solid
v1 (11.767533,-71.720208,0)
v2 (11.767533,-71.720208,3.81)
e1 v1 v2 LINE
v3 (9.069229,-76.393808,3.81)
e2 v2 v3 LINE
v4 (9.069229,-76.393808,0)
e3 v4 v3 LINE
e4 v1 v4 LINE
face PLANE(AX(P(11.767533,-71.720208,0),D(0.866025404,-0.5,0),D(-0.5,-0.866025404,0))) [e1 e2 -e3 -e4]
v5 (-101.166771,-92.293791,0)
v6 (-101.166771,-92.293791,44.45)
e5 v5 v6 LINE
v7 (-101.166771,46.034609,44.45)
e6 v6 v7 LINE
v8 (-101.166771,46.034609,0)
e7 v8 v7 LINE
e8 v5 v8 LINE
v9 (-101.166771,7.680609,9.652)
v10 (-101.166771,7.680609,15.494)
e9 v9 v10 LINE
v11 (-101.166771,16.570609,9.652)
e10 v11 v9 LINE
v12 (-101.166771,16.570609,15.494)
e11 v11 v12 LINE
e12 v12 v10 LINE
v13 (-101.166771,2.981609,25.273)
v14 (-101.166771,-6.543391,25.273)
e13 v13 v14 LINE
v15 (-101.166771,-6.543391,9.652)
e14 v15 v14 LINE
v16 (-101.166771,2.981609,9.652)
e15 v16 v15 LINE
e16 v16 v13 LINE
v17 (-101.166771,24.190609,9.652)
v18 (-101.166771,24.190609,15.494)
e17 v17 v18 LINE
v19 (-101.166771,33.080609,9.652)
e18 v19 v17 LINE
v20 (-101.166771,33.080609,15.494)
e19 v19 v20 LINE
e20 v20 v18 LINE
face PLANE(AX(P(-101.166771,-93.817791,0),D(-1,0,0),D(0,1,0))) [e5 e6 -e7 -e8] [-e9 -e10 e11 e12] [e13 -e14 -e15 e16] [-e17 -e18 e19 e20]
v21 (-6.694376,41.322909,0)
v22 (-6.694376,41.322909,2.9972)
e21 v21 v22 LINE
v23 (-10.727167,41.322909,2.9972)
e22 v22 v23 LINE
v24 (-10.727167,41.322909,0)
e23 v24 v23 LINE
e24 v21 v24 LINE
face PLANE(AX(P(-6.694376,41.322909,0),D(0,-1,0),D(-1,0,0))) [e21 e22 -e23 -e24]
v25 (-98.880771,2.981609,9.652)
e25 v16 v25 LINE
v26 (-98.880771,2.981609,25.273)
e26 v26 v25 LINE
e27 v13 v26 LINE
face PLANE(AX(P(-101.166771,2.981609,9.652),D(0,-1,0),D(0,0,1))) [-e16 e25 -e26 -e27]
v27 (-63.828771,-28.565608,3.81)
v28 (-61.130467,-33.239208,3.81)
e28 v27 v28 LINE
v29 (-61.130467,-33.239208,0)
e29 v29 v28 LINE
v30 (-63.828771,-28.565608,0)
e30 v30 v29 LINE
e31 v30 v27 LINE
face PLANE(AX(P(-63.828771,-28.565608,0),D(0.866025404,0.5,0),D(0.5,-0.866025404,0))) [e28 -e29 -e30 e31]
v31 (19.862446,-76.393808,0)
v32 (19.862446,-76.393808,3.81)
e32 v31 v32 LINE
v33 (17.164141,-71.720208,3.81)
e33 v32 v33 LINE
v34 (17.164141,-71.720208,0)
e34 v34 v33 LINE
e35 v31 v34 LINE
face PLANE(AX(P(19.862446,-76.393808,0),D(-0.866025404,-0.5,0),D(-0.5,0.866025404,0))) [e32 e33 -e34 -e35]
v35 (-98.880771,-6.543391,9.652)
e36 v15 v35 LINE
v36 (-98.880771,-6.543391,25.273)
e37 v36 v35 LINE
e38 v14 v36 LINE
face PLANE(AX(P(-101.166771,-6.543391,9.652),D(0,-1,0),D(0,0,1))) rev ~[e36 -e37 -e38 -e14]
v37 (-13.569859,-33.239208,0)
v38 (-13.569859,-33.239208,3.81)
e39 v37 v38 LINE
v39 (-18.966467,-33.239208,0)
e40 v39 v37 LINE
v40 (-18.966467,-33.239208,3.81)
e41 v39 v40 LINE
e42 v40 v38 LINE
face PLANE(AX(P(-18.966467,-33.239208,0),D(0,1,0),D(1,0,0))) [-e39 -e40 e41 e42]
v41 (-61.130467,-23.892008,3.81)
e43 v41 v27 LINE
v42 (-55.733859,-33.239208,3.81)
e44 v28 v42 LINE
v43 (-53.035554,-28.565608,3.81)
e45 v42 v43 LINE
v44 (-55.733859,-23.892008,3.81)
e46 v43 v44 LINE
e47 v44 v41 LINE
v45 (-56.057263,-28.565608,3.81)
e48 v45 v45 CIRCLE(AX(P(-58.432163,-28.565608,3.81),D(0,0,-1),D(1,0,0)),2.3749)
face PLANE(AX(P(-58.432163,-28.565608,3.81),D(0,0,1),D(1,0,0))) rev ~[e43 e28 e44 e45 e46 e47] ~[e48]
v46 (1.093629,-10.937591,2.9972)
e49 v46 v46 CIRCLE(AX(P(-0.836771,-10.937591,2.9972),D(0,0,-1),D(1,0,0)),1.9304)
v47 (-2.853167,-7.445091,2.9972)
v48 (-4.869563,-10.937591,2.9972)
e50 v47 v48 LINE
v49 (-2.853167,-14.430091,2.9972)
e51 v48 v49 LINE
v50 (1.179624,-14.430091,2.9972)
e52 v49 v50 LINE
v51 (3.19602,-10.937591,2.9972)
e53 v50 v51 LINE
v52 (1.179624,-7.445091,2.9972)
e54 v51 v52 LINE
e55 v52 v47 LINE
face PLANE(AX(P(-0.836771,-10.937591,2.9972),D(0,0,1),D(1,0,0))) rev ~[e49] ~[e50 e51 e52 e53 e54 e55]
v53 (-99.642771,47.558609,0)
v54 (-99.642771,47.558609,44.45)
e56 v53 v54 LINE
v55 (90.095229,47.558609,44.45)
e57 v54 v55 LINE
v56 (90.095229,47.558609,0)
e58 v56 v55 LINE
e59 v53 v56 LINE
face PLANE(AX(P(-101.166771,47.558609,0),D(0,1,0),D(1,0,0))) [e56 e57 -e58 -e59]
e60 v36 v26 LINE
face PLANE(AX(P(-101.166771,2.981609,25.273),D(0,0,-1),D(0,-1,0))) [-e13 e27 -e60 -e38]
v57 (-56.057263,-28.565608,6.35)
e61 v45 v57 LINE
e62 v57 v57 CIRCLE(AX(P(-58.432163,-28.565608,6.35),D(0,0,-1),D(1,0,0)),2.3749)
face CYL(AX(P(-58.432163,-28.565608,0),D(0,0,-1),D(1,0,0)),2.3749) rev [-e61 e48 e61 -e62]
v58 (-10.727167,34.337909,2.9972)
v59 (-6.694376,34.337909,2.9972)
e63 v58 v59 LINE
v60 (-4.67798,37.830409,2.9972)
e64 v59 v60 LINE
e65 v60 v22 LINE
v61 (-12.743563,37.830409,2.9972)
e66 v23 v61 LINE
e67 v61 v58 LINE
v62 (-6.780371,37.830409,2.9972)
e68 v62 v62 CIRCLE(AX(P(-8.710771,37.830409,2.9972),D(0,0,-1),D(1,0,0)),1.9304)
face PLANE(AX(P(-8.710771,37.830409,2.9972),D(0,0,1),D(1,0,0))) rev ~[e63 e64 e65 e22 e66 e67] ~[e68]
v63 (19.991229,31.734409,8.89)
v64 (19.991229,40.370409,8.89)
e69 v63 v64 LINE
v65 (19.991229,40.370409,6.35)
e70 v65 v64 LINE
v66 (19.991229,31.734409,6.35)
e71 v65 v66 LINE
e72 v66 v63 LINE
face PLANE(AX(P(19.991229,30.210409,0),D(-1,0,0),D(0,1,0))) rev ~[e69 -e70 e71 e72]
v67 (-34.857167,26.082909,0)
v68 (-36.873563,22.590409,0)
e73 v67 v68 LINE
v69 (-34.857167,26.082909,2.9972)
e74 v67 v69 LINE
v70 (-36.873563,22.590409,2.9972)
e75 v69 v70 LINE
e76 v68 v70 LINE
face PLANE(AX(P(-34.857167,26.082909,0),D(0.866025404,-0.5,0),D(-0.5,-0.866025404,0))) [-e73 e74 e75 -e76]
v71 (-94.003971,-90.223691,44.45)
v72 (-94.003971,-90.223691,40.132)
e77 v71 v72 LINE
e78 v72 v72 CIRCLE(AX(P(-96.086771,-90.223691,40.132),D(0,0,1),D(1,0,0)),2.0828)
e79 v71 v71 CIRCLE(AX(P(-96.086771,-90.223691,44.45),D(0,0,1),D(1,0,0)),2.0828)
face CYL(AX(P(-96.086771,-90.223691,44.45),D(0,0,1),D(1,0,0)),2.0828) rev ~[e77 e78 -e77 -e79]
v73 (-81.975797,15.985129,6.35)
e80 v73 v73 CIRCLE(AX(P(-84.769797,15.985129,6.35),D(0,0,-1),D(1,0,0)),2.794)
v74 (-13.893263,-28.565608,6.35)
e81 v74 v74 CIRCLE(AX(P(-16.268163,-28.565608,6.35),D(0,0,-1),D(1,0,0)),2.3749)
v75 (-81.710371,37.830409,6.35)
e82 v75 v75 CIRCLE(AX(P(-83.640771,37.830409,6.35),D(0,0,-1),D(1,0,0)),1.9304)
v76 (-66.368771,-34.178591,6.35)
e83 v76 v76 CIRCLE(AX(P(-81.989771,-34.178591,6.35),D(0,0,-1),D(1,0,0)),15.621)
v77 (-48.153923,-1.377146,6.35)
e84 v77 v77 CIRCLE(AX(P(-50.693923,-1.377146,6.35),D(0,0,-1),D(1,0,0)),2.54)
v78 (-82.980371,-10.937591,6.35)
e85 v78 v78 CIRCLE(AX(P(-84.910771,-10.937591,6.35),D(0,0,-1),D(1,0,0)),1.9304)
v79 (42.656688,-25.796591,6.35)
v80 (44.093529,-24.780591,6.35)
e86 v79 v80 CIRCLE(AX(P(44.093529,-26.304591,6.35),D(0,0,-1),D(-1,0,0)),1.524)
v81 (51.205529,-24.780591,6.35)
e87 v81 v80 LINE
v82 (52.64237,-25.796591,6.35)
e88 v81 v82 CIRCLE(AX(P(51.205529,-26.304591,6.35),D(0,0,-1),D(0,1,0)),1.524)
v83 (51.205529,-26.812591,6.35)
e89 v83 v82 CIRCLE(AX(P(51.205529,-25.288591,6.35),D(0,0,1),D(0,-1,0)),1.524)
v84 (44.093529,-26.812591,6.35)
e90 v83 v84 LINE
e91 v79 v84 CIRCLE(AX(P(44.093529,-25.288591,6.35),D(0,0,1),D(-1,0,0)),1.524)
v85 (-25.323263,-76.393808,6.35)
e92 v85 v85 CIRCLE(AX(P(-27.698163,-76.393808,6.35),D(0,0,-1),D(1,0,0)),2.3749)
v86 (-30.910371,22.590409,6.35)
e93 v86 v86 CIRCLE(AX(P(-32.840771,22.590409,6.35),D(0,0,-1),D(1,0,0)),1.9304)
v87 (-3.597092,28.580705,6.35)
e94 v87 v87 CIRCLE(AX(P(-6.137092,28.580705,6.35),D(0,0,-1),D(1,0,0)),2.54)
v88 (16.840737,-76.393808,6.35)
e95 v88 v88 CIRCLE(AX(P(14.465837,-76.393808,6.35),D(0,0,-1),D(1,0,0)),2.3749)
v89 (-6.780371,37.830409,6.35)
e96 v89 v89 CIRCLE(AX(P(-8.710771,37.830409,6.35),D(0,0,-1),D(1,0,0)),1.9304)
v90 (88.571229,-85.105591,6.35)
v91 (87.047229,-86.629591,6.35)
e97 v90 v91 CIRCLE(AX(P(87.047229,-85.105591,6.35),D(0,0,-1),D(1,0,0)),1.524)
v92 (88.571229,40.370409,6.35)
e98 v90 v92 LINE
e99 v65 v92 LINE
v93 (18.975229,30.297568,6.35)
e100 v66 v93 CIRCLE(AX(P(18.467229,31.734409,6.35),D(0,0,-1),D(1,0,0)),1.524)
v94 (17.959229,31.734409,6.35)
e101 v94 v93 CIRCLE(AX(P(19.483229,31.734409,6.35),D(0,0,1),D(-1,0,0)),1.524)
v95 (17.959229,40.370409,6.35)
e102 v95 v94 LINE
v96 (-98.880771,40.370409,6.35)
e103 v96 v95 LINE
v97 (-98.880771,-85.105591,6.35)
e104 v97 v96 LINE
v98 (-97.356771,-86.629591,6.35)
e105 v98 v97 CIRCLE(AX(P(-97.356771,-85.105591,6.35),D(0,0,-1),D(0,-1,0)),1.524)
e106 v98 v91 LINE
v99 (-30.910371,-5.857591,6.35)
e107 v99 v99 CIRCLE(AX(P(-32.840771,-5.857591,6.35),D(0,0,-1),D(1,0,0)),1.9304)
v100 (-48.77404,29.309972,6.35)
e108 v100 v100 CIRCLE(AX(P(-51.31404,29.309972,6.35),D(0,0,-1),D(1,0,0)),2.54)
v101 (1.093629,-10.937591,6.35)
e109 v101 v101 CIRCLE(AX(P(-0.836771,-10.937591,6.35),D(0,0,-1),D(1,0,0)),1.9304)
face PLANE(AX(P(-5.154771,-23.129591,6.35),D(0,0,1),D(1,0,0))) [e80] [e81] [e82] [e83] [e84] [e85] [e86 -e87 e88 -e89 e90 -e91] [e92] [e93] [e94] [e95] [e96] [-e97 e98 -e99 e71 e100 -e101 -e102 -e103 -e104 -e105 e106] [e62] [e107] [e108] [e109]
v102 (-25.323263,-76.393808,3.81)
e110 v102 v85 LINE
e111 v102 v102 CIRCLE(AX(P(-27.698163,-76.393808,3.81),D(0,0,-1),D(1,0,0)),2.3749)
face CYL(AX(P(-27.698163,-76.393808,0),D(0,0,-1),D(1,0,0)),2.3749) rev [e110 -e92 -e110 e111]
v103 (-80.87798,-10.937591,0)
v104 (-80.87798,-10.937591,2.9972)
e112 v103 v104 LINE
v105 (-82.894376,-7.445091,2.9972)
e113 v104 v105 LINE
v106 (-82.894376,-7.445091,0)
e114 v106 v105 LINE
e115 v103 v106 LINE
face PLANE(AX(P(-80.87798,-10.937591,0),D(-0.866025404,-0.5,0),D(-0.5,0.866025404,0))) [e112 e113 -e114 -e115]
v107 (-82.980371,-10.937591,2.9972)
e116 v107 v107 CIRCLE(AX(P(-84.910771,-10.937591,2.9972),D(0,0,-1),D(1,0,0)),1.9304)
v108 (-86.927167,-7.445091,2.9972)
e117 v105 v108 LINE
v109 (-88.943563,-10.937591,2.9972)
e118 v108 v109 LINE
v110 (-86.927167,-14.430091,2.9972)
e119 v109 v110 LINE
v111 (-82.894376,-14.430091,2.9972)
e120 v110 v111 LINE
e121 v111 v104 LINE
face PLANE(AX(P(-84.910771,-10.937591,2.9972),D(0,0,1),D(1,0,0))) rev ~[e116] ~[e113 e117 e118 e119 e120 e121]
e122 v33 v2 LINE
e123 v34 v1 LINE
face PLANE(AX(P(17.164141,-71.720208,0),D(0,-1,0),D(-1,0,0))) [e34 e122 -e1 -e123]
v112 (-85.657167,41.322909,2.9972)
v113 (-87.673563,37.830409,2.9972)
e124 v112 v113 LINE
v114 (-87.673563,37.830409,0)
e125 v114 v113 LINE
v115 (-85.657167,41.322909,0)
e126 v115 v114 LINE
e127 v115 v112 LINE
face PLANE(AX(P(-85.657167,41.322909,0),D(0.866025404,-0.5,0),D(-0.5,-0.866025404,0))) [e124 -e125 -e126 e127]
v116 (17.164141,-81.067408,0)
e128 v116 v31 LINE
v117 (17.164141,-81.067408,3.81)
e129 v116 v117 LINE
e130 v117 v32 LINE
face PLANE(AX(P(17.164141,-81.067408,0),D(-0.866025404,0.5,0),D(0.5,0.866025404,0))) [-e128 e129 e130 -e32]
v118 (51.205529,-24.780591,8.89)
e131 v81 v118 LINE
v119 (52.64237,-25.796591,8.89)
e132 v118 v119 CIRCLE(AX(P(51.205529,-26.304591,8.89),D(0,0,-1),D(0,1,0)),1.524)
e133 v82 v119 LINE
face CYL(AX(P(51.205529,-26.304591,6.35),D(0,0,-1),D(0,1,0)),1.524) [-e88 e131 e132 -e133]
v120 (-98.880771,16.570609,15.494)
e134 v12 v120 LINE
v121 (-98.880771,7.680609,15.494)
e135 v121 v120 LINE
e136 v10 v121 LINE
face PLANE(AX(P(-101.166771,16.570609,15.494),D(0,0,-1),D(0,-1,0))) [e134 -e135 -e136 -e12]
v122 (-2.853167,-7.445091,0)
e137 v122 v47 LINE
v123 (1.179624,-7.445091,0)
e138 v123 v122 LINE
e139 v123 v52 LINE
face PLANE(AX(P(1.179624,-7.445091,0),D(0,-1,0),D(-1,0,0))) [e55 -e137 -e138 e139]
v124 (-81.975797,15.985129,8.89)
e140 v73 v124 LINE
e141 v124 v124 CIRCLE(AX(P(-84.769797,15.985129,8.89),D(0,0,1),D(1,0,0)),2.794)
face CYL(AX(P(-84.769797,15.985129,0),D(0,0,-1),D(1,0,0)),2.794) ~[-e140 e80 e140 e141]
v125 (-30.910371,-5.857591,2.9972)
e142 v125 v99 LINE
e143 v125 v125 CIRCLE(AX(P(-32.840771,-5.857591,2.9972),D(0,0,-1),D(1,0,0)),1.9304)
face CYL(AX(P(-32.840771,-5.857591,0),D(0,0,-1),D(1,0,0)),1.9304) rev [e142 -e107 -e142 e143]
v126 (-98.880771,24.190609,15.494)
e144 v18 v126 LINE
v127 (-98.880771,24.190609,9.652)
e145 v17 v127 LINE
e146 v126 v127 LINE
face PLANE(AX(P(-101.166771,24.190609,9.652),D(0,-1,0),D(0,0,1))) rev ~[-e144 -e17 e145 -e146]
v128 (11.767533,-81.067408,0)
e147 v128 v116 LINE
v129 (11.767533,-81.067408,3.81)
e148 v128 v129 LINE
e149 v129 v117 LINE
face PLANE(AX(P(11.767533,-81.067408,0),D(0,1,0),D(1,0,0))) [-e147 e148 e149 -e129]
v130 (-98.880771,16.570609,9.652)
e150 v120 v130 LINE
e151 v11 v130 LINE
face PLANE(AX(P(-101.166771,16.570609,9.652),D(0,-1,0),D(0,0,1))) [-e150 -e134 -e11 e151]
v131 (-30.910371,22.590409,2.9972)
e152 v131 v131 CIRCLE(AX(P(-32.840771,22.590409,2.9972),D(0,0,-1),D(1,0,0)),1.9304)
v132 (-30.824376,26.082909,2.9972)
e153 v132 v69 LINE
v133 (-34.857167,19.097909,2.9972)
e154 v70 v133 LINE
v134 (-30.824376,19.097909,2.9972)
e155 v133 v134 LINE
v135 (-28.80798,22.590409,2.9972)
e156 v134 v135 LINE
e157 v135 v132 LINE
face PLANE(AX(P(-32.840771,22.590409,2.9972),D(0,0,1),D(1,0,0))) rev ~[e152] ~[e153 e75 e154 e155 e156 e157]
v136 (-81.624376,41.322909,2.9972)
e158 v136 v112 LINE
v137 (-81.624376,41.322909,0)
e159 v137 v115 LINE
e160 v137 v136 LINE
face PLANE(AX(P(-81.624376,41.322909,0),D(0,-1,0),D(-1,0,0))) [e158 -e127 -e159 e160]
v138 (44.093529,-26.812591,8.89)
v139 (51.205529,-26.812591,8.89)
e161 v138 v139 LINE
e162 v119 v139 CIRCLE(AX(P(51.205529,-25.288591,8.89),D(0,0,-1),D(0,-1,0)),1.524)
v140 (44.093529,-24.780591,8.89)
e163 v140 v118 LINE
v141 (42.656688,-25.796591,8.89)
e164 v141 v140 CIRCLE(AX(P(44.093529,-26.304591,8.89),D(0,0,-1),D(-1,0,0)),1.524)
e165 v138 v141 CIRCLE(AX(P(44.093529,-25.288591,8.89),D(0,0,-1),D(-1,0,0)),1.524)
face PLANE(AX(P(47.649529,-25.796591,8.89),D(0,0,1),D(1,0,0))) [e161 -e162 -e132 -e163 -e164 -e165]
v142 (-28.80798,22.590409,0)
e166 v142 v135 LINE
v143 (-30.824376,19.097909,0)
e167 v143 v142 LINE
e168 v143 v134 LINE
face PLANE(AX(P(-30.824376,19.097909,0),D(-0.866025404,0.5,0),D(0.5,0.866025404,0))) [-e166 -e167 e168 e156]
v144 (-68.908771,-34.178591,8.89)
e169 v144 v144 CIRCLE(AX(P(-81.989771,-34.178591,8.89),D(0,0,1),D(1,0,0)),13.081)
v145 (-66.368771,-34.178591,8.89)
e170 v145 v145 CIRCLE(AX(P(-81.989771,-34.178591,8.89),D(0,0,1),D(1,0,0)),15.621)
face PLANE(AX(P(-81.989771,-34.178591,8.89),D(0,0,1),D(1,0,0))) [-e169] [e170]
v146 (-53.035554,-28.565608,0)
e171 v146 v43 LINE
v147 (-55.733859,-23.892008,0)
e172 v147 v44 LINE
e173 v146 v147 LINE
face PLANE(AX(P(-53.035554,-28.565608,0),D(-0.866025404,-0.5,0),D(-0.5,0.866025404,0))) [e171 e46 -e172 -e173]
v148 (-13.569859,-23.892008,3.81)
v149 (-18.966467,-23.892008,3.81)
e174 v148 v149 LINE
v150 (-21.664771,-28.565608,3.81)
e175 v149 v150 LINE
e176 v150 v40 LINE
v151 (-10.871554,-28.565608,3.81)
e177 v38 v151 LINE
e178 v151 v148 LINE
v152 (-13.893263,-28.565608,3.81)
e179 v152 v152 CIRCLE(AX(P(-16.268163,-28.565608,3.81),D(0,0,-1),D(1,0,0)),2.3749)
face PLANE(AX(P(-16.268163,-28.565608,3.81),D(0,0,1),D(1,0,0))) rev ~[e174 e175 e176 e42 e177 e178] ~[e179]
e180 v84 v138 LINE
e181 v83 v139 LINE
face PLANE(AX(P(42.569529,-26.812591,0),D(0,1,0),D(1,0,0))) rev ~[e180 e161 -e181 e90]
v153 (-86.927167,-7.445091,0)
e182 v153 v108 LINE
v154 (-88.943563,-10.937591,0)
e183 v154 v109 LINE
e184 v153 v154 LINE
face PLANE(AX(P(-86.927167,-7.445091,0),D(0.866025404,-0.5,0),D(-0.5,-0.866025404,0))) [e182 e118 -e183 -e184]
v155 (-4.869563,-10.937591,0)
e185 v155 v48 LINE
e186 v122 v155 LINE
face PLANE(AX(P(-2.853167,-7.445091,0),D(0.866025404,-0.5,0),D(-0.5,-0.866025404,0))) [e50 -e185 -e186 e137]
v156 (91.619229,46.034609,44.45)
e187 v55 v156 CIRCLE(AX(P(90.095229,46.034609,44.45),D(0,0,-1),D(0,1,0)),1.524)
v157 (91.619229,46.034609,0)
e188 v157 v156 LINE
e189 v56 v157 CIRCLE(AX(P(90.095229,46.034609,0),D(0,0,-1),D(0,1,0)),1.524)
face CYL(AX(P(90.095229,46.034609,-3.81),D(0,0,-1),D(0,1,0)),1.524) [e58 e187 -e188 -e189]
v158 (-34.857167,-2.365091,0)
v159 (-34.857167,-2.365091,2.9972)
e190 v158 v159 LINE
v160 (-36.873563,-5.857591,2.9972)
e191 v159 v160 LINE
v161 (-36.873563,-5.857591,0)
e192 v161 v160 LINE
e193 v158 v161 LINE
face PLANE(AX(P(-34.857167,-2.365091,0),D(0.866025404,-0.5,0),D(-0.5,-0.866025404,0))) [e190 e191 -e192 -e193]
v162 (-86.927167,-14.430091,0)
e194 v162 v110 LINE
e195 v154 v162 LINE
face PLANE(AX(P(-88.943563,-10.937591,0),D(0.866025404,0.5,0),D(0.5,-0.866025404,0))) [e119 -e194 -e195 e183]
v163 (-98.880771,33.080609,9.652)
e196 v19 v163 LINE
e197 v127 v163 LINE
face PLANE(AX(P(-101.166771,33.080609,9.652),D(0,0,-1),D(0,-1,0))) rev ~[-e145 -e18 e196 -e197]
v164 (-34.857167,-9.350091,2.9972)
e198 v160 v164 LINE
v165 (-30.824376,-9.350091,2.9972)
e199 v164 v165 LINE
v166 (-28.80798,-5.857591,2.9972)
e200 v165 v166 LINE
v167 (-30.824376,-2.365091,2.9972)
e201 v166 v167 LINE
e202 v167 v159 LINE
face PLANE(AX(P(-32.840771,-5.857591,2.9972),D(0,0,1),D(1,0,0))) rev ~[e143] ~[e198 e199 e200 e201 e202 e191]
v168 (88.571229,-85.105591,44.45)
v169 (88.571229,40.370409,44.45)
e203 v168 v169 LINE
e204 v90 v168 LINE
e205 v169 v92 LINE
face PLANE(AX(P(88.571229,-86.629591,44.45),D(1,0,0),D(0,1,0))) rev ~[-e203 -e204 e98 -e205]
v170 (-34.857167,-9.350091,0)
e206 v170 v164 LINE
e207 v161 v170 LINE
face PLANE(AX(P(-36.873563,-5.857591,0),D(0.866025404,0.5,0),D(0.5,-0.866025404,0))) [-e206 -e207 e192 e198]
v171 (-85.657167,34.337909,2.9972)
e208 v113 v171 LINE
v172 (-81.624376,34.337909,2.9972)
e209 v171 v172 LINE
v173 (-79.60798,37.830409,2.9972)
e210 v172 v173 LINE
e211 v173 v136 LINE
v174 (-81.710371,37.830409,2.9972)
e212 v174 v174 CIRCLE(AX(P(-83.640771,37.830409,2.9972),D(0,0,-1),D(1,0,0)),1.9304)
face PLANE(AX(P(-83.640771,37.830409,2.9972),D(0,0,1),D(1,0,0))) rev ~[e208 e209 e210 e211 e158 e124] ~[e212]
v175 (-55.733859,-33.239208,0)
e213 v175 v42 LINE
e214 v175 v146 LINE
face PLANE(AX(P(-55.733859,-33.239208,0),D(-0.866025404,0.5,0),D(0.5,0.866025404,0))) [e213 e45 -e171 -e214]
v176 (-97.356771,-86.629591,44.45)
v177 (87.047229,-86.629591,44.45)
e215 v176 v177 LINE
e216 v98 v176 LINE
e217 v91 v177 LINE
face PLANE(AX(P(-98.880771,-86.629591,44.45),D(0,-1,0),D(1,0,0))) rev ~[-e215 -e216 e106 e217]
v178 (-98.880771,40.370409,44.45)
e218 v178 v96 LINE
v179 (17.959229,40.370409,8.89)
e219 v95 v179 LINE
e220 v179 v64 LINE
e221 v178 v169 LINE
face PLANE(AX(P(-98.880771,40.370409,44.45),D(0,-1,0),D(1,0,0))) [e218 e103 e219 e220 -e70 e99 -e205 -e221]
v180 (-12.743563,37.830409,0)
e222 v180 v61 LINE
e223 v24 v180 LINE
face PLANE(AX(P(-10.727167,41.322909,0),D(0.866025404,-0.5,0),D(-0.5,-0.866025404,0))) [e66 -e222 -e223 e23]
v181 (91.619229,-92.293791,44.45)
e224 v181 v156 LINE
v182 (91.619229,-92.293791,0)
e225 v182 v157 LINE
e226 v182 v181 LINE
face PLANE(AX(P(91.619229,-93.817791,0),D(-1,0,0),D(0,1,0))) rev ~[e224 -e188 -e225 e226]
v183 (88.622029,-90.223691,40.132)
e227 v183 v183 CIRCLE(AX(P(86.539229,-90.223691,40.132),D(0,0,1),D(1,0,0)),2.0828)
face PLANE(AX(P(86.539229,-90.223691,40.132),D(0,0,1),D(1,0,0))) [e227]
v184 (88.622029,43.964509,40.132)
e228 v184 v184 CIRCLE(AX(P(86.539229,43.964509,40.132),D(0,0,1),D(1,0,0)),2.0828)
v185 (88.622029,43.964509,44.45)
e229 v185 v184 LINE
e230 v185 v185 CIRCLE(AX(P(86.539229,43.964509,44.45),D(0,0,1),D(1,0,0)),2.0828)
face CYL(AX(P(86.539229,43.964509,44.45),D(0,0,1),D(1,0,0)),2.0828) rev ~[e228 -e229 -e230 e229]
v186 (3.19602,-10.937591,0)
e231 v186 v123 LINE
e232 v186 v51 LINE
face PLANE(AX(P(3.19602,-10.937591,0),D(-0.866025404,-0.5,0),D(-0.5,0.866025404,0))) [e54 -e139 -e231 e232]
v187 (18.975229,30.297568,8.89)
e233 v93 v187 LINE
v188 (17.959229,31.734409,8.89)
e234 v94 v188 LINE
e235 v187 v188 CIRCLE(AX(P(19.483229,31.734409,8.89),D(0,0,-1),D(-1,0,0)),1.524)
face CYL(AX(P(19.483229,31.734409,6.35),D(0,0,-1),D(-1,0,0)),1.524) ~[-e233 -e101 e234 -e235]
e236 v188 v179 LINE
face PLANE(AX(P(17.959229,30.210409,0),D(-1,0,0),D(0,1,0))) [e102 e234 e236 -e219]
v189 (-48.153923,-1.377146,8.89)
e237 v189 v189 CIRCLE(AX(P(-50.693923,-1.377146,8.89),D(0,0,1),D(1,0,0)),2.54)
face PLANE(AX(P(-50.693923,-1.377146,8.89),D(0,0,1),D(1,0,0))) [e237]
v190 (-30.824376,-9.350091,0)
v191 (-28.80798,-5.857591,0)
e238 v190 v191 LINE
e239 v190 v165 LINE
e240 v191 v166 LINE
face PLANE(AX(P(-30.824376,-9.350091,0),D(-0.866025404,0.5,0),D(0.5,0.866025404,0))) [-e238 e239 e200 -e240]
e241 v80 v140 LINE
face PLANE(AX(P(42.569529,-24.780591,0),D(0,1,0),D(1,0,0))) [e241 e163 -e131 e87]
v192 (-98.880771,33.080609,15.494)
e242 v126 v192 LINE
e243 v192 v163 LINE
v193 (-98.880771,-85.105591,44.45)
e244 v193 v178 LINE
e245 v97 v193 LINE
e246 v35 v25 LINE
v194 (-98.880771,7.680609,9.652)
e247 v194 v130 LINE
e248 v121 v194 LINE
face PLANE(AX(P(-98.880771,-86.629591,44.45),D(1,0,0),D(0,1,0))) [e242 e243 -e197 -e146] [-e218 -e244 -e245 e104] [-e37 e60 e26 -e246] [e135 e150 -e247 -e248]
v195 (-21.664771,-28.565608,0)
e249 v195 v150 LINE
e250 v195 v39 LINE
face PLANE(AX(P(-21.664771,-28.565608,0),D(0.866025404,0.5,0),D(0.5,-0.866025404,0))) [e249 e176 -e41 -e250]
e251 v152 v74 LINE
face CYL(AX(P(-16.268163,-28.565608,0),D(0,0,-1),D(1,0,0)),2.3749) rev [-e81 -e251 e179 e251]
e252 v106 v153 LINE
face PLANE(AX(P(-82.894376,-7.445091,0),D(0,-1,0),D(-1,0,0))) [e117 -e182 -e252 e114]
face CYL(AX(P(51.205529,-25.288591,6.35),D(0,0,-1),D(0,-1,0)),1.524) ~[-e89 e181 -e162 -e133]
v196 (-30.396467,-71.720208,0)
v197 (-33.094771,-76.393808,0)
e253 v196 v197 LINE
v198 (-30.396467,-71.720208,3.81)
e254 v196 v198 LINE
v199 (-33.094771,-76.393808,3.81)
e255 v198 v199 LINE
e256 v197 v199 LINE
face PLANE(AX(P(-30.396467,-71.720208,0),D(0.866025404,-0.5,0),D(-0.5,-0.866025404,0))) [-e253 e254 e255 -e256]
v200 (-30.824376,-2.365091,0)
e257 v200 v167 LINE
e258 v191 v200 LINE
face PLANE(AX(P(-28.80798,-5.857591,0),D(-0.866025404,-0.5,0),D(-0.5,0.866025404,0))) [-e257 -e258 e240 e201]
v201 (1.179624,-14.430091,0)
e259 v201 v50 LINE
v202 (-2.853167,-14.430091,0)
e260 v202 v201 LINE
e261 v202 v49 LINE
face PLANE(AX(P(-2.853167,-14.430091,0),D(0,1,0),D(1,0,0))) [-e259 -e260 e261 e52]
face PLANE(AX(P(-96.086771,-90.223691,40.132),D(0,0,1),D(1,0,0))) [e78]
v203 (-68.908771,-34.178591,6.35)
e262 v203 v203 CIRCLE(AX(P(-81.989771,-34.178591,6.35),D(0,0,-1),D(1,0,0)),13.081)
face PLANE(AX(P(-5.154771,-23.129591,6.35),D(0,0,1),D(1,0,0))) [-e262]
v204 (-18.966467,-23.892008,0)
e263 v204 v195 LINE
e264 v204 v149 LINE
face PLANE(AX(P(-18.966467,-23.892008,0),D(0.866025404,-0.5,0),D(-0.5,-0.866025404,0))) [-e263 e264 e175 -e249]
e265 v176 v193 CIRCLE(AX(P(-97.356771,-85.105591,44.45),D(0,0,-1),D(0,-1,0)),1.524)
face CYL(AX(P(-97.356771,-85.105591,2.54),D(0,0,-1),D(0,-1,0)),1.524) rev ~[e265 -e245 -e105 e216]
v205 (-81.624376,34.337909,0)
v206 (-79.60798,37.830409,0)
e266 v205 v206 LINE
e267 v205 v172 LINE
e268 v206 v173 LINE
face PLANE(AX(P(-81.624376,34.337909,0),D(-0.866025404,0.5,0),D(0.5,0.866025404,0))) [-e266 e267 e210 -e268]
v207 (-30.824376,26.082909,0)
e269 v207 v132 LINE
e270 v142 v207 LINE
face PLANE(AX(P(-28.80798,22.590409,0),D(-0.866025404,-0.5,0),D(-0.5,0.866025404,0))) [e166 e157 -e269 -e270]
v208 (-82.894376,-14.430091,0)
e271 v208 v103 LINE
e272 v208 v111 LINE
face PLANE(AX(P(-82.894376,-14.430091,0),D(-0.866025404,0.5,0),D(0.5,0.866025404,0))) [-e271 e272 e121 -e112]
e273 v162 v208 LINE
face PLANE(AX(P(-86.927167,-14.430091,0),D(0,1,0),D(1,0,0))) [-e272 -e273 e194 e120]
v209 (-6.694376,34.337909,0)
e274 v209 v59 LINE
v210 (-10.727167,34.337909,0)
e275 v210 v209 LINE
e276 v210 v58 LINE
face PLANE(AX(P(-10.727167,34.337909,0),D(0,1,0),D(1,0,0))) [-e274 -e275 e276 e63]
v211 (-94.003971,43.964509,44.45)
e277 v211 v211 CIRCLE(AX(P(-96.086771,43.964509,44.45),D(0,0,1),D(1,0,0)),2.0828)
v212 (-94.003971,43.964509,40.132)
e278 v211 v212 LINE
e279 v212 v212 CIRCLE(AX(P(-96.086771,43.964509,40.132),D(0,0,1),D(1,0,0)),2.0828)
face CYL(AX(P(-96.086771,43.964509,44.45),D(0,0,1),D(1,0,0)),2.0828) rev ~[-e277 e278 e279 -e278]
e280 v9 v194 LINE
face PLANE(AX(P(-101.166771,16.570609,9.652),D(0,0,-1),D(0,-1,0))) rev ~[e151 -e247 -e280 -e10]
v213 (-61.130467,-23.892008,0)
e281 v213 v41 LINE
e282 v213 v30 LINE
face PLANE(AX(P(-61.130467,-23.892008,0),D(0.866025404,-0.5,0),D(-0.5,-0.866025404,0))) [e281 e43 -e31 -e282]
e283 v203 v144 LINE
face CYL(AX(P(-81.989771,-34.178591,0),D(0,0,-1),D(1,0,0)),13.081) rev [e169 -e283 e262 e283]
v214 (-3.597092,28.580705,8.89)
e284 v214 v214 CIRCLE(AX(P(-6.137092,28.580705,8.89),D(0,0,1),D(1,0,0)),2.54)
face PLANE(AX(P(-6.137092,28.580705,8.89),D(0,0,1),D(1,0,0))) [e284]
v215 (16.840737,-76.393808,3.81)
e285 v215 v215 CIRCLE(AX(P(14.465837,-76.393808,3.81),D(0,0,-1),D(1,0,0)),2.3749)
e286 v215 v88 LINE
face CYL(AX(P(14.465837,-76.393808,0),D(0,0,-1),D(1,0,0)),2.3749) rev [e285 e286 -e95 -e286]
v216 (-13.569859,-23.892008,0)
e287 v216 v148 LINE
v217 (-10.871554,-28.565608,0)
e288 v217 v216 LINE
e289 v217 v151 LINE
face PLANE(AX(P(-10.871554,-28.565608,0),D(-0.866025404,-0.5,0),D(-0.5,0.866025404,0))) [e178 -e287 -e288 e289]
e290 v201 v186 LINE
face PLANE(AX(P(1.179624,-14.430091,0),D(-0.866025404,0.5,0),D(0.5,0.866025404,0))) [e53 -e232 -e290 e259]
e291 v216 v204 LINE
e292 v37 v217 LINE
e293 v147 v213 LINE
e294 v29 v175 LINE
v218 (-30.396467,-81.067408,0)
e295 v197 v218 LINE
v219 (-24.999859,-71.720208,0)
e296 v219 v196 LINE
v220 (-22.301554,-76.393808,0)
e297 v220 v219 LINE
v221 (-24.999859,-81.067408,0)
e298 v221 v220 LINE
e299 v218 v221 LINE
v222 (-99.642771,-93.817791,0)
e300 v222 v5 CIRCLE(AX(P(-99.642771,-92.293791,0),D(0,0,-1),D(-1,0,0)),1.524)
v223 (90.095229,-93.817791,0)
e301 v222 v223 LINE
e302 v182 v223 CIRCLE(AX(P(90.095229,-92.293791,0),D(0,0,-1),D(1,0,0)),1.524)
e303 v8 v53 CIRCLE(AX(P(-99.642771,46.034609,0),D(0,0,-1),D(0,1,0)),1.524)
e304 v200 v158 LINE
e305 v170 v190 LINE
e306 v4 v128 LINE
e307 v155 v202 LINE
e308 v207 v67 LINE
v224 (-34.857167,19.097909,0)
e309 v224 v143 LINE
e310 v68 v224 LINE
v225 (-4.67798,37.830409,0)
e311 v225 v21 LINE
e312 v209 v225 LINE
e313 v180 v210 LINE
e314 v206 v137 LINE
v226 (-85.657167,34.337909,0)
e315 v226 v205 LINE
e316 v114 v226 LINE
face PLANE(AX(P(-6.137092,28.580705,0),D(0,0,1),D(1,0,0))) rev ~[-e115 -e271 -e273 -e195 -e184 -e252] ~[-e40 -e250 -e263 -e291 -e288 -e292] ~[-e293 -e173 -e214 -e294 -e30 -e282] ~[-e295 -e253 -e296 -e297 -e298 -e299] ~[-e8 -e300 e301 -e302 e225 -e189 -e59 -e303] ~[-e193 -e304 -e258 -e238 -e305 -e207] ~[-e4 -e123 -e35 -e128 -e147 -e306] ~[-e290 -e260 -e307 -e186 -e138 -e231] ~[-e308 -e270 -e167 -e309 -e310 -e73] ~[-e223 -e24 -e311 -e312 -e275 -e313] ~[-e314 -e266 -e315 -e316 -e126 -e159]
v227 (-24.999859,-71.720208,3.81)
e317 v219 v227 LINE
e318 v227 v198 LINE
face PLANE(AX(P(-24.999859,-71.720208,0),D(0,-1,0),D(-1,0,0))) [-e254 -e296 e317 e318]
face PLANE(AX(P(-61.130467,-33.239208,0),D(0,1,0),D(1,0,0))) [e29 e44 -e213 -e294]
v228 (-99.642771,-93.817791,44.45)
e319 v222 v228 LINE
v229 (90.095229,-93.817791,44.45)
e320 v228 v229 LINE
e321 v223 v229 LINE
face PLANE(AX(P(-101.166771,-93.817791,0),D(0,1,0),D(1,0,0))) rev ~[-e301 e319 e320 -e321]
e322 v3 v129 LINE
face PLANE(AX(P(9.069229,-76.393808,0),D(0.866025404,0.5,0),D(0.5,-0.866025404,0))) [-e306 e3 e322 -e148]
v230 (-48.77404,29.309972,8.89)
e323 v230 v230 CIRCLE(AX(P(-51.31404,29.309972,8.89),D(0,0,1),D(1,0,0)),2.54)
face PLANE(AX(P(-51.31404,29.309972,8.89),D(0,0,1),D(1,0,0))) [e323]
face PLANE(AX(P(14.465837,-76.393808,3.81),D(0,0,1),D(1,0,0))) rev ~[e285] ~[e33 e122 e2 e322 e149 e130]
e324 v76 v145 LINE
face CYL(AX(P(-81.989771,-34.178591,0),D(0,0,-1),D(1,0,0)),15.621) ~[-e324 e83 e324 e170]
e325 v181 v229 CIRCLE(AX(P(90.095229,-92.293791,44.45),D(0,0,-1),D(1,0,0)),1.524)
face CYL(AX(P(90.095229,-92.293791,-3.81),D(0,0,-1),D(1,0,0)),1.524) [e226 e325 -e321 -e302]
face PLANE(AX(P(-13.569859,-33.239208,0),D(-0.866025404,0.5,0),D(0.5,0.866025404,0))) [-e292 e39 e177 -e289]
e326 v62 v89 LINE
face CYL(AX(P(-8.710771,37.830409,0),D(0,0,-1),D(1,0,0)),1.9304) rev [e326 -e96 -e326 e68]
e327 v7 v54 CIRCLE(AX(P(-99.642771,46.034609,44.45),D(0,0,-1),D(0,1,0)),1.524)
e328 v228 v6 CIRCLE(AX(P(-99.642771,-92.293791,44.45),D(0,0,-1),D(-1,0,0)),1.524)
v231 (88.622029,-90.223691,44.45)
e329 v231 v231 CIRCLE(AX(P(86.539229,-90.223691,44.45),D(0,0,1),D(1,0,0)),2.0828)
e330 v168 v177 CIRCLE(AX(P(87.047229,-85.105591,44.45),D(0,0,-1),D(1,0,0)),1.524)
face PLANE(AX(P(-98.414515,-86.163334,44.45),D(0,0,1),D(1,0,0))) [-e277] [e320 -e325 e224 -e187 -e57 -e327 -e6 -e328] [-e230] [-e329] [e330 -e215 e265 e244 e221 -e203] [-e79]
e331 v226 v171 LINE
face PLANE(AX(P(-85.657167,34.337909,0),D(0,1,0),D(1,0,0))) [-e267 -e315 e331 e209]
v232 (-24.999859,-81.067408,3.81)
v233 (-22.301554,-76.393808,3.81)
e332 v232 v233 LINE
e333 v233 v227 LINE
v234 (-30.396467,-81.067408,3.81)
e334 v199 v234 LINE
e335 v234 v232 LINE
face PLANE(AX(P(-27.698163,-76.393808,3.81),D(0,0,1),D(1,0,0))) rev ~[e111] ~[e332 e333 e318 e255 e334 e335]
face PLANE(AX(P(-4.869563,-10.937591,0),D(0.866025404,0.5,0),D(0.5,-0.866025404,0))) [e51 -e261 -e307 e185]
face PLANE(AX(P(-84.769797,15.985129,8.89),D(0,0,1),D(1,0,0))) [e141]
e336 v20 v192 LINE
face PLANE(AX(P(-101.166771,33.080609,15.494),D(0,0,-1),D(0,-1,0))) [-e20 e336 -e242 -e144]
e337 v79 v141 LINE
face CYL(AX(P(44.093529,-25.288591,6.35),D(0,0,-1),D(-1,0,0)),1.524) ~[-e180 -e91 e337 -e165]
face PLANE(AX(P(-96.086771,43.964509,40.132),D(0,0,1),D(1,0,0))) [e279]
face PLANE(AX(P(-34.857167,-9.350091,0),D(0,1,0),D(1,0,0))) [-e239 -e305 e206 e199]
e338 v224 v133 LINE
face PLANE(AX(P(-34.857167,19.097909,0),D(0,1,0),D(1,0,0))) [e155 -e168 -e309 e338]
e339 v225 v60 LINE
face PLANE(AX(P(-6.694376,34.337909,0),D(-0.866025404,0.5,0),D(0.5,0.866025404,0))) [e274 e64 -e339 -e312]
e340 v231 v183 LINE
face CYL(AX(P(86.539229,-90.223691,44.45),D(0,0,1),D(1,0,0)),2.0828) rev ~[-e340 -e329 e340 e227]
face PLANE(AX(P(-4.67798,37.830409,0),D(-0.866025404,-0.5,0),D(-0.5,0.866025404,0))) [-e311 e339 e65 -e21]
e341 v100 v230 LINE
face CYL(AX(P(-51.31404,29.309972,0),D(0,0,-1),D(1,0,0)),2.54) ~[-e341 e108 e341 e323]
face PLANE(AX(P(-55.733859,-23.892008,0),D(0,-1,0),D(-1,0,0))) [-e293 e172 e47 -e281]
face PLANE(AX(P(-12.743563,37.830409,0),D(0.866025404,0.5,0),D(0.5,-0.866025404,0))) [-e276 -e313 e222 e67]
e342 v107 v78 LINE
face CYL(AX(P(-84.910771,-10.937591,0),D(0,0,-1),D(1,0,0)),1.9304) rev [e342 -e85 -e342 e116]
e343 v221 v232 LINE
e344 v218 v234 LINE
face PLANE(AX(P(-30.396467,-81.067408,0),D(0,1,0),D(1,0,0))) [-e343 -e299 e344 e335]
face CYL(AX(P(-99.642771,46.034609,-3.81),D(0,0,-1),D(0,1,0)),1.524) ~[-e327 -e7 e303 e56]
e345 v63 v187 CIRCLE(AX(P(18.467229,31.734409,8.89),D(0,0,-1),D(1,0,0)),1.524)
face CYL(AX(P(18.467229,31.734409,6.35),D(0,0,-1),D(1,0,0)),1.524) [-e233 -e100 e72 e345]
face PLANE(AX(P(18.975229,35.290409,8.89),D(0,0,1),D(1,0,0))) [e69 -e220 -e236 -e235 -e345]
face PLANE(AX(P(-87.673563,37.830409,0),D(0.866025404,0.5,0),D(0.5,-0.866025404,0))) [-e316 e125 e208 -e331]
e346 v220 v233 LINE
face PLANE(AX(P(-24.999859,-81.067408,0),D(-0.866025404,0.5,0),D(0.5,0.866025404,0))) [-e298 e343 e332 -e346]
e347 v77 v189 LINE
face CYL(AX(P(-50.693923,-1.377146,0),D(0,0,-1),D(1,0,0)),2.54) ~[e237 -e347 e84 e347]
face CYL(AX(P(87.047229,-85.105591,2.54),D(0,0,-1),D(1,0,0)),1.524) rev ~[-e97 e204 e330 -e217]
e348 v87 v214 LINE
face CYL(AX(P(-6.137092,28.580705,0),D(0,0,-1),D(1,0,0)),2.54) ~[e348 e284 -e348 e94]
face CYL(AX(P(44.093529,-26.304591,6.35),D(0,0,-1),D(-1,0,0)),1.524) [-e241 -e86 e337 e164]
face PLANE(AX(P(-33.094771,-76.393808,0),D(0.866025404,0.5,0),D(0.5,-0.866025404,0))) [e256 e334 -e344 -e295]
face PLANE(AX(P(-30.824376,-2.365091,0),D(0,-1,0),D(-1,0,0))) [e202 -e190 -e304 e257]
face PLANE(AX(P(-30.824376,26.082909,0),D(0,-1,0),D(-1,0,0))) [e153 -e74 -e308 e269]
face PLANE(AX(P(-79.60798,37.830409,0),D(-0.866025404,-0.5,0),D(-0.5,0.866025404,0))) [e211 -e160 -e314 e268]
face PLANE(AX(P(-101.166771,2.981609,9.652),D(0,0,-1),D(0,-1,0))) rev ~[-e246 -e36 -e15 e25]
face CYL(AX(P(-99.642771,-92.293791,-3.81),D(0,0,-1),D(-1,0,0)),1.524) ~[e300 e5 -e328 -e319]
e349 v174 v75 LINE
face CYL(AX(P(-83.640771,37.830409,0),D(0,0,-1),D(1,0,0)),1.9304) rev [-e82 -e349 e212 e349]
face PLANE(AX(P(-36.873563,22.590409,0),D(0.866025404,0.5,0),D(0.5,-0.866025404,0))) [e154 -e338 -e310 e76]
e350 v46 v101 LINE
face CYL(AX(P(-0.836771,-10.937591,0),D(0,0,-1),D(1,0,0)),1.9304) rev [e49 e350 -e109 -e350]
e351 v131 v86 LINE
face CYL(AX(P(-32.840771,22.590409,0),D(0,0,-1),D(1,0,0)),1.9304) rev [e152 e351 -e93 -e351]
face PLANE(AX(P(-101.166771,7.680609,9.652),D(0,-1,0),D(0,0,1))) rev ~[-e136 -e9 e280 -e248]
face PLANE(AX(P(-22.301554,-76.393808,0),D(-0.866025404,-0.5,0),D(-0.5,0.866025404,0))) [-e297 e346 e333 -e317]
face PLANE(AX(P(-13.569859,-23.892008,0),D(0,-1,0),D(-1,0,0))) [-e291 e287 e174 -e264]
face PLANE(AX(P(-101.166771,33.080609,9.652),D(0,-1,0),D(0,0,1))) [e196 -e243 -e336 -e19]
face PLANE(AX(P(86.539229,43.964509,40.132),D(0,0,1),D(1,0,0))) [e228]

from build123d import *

# Parameters (mm, degrees)
F5_W         = 192.786
F5_H         = 141.3764
F7_DEPTH     = 44.45
F12_W        = 187.452
F12_H        = 127
F14_DEPTH    = 38.1
F4_R         = 15.621
F4_R_2       = 13.081
F13_W        = 2.032
F13_H        = 10.16
F13_W_2      = 10.16
F13_H_2      = 2.032
F15_DEPTH    = 8.89
F16_DEPTH    = 2.9972
F17_DEPTH    = 3.81
F10_R        = 2.3749
F18_DEPTH    = 25.4
F3_R         = 1.9304
F19_DEPTH    = 25.4
F11_R        = 2.54
F11_R_2      = 2.794
F20_DEPTH    = 8.89
F21_W        = 8.89
F21_H        = 5.842
F21_W_2      = 9.525
F21_H_2      = 15.621
F22_DEPTH    = 25.4
F23_R        = 2.0828
F24_DEPTH    = 4.318
F25_T1_DEPTH = 41.91
F25_T3_DEPTH = 52.07
F25_T5_DEPTH = 6.35


# Not quite as in the source:
# - a fillet or chamfer that OpenCascade refuses, or shapes differently, is made with other operations: its cross-section is extruded or revolved along the edge and cut away or added


with BuildPart() as f7:
    # F5 (on Top) → F7 (new body)
    with BuildSketch(Plane.XY):
        with Locations((-4.773771323, -23.1295908162)):
            Rectangle(F5_W, F5_H)
    extrude(amount=F7_DEPTH)

    # F12 (on face) → F14 (cut)
    with BuildSketch(Plane.XY.offset(44.45)):
        with Locations((-5.154771323, -23.1295908162)):
            Rectangle(F12_W, F12_H)
    extrude(amount=-F14_DEPTH, mode=Mode.SUBTRACT)

    # F4 (on Top) + F13 (on Top) → F15 (join)
    with BuildSketch(Plane.XY):
        with Locations((-81.989771323, -34.1785908162)):
            Circle(F4_R)
        with Locations((-81.989771323, -34.1785908162)):
            Circle(F4_R_2, mode=Mode.SUBTRACT)
    with BuildSketch(Plane.XY):
        with Locations((18.975228677, 35.2904091838)):
            Rectangle(F13_W, F13_H)
        with Locations((47.6495291469, -25.7965908162)):
            Rectangle(F13_W_2, F13_H_2)
    extrude(amount=F15_DEPTH)

    # F6 (on face) → F16 (cut)
    with BuildSketch(Plane.XY):
        Polygon((-81.6243755079, 34.3379091838), (-79.6079796927, 37.8304091838), (-81.6243755079, 41.3229091838), (-85.6571671382, 41.3229091838), (-87.6735629533, 37.8304091838), (-85.6571671382, 34.3379091838), align=None)
        Polygon((-6.6943755079, 34.3379091838), (-4.6779796927, 37.8304091838), (-6.6943755079, 41.3229091838), (-10.7271671382, 41.3229091838), (-12.7435629533, 37.8304091838), (-10.7271671382, 34.3379091838), align=None)
        Polygon((-30.8243755079, 19.0979091838), (-28.8079796927, 22.5904091838), (-30.8243755079, 26.0829091838), (-34.8571671382, 26.0829091838), (-36.8735629533, 22.5904091838), (-34.8571671382, 19.0979091838), align=None)
        Polygon((-82.8943755079, -14.4300908162), (-80.8779796927, -10.9375908162), (-82.8943755079, -7.4450908162), (-86.9271671382, -7.4450908162), (-88.9435629533, -10.9375908162), (-86.9271671382, -14.4300908162), align=None)
        Polygon((-30.8243755079, -9.3500908162), (-28.8079796927, -5.8575908162), (-30.8243755079, -2.3650908162), (-34.8571671382, -2.3650908162), (-36.8735629533, -5.8575908162), (-34.8571671382, -9.3500908162), align=None)
        Polygon((1.1796244921, -14.4300908162), (3.1960203073, -10.9375908162), (1.1796244921, -7.4450908162), (-2.8531671382, -7.4450908162), (-4.8695629533, -10.9375908162), (-2.8531671382, -14.4300908162), align=None)
    extrude(amount=F16_DEPTH, mode=Mode.SUBTRACT)

    # F9 (on Top) → F17 (cut)
    with BuildSketch(Plane.XY):
        Polygon((-55.7338586688, -33.239207965), (-53.0355544507, -28.565607965), (-55.7338586688, -23.892007965), (-61.130467105, -23.892007965), (-63.828771323, -28.565607965), (-61.130467105, -33.239207965), align=None)
        Polygon((-24.9998586688, -81.067407965), (-22.3015544507, -76.393807965), (-24.9998586688, -71.720207965), (-30.396467105, -71.720207965), (-33.094771323, -76.393807965), (-30.396467105, -81.067407965), align=None)
        Polygon((17.1641413312, -71.720207965), (14.4658371131, -71.720207965), (11.767532895, -71.720207965), (9.069228677, -76.393807965), (11.767532895, -81.067407965), (17.1641413312, -81.067407965), (19.8624455493, -76.393807965), align=None)
        Polygon((-10.8715544507, -28.565607965), (-13.5698586688, -23.892007965), (-18.966467105, -23.892007965), (-21.664771323, -28.565607965), (-18.966467105, -33.239207965), (-13.5698586688, -33.239207965), align=None)
    extrude(amount=F17_DEPTH, mode=Mode.SUBTRACT)

    # F10 (on Top) → F18 (cut)
    with BuildSketch(Plane.XY):
        with Locations((-58.4321628869, -28.565607965)):
            Circle(F10_R)
        with Locations((-27.6981628869, -76.393807965)):
            Circle(F10_R)
        with Locations((-16.2681628869, -28.565607965)):
            Circle(F10_R)
        with Locations((14.4658371131, -76.393807965)):
            Circle(F10_R)
    extrude(amount=F18_DEPTH, mode=Mode.SUBTRACT)

    # F3 (on Top) → F19 (cut)
    with BuildSketch(Plane.XY):
        with Locations((-84.910771323, -10.9375908162)):
            Circle(F3_R)
        with Locations((-32.840771323, -5.8575908162)):
            Circle(F3_R)
        with Locations((-32.840771323, 22.5904091838)):
            Circle(F3_R)
        with Locations((-8.710771323, 37.8304091838)):
            Circle(F3_R)
        with Locations((-83.640771323, 37.8304091838)):
            Circle(F3_R)
        with Locations((-0.836771323, -10.9375908162)):
            Circle(F3_R)
    extrude(amount=F19_DEPTH, mode=Mode.SUBTRACT)

    # F11 (on Top) → F20 (join)
    with BuildSketch(Plane.XY):
        with Locations((-6.1370921321, 28.5807047039)):
            Circle(F11_R)
        with Locations((-51.3140404916, 29.3099723562)):
            Circle(F11_R)
        with Locations((-50.6939233637, -1.3771463051)):
            Circle(F11_R)
        with Locations((-84.7697969953, 15.9851294398)):
            Circle(F11_R_2)
    extrude(amount=F20_DEPTH)

    # F21 (on face) → F22 (cut)
    with BuildSketch(Plane(origin=(-101.166771323, 0, 0), x_dir=(0, -1, 0), z_dir=(-1, 0, 0))):
        with Locations((-12.1256091838, 12.573)):
            Rectangle(F21_W, F21_H)
        with Locations((-28.6356091838, 12.573)):
            Rectangle(F21_W, F21_H)
        with Locations((1.7808908162, 17.4625)):
            Rectangle(F21_W_2, F21_H_2)
    extrude(amount=-F22_DEPTH, mode=Mode.SUBTRACT)

    # F23 (on face) → F24 (cut)
    with BuildSketch(Plane.XY.offset(44.45)):
        with Locations((-96.086771323, -90.2236908162)):
            Circle(F23_R)
        with Locations((86.539228677, -90.2236908162)):
            Circle(F23_R)
        with Locations((86.539228677, 43.9645091838)):
            Circle(F23_R)
        with Locations((-96.086771323, 43.9645091838)):
            Circle(F23_R)
    extrude(amount=-F24_DEPTH, mode=Mode.SUBTRACT)

    # F25: fillet of radius 1.524 on 12 edges, made by hand

    # F25_s2 → F25_t1 (join)
    with BuildSketch(Plane.XY.offset(2.54)):
        with BuildLine():
            ThreePointArc((-97.356771323, -86.6295908162), (-98.4344020576, -86.1832215507), (-98.880771323, -85.1055908162))
            Line((-98.880771323, -85.1055908162), (-98.880771323, -86.6295908162))
            Line((-98.880771323, -86.6295908162), (-97.356771323, -86.6295908162))
        make_face()
        with BuildLine():
            ThreePointArc((88.571228677, -85.1055908162), (88.1248594115, -86.1832215507), (87.047228677, -86.6295908162))
            Line((87.047228677, -86.6295908162), (88.571228677, -86.6295908162))
            Line((88.571228677, -86.6295908162), (88.571228677, -85.1055908162))
        make_face()
    extrude(amount=F25_T1_DEPTH)

    # F25_s4 → F25_t3 (cut)
    with BuildSketch(Plane.XY.offset(-3.81)):
        with BuildLine():
            ThreePointArc((-99.642771323, 47.5586091838), (-100.7204020576, 47.1122399184), (-101.166771323, 46.0346091838))
            Line((-101.166771323, 46.0346091838), (-101.166771323, 47.5586091838))
            Line((-101.166771323, 47.5586091838), (-99.642771323, 47.5586091838))
        make_face()
        with BuildLine():
            ThreePointArc((-101.166771323, -92.2937908162), (-100.7204020576, -93.3714215507), (-99.642771323, -93.8177908162))
            Line((-99.642771323, -93.8177908162), (-101.166771323, -93.8177908162))
            Line((-101.166771323, -93.8177908162), (-101.166771323, -92.2937908162))
        make_face()
        with BuildLine():
            ThreePointArc((91.619228677, -92.2937908162), (91.1728594115, -93.3714215507), (90.095228677, -93.8177908162))
            Line((90.095228677, -93.8177908162), (91.619228677, -93.8177908162))
            Line((91.619228677, -93.8177908162), (91.619228677, -92.2937908162))
        make_face()
        with BuildLine():
            ThreePointArc((90.095228677, 47.5586091838), (91.1728594115, 47.1122399184), (91.619228677, 46.0346091838))
            Line((91.619228677, 46.0346091838), (91.619228677, 47.5586091838))
            Line((91.619228677, 47.5586091838), (90.095228677, 47.5586091838))
        make_face()
    extrude(amount=F25_T3_DEPTH, mode=Mode.SUBTRACT)

    # F25_s6 → F25_t5 (cut)
    with BuildSketch(Plane.XY.offset(6.35)):
        with BuildLine():
            ThreePointArc((17.959228677, 31.7344091838), (18.4055979424, 30.6567784493), (19.483228677, 30.2104091838))
            Line((19.483228677, 30.2104091838), (17.959228677, 30.2104091838))
            Line((17.959228677, 30.2104091838), (17.959228677, 31.7344091838))
        make_face()
        with BuildLine():
            ThreePointArc((42.5695291469, -25.2885908162), (43.0158984124, -26.3662215507), (44.0935291469, -26.8125908162))
            Line((44.0935291469, -26.8125908162), (42.5695291469, -26.8125908162))
            Line((42.5695291469, -26.8125908162), (42.5695291469, -25.2885908162))
        make_face()
        with BuildLine():
            ThreePointArc((42.5695291469, -26.3045908162), (43.0158984124, -25.2269600816), (44.0935291469, -24.7805908162))
            Line((44.0935291469, -24.7805908162), (42.5695291469, -24.7805908162))
            Line((42.5695291469, -24.7805908162), (42.5695291469, -26.3045908162))
        make_face()
        with BuildLine():
            ThreePointArc((19.991228677, 31.7344091838), (19.5448594115, 30.6567784493), (18.467228677, 30.2104091838))
            Line((18.467228677, 30.2104091838), (19.991228677, 30.2104091838))
            Line((19.991228677, 30.2104091838), (19.991228677, 31.7344091838))
        make_face()
        with BuildLine():
            ThreePointArc((51.2055291469, -26.8125908162), (52.2831598814, -26.3662215507), (52.7295291469, -25.2885908162))
            Line((52.7295291469, -25.2885908162), (52.7295291469, -26.8125908162))
            Line((52.7295291469, -26.8125908162), (51.2055291469, -26.8125908162))
        make_face()
        with BuildLine():
            ThreePointArc((51.2055291469, -24.7805908162), (52.2831598814, -25.2269600816), (52.7295291469, -26.3045908162))
            Line((52.7295291469, -26.3045908162), (52.7295291469, -24.7805908162))
            Line((52.7295291469, -24.7805908162), (51.2055291469, -24.7805908162))
        make_face()
    extrude(amount=F25_T5_DEPTH, mode=Mode.SUBTRACT)


solid = f7.part
